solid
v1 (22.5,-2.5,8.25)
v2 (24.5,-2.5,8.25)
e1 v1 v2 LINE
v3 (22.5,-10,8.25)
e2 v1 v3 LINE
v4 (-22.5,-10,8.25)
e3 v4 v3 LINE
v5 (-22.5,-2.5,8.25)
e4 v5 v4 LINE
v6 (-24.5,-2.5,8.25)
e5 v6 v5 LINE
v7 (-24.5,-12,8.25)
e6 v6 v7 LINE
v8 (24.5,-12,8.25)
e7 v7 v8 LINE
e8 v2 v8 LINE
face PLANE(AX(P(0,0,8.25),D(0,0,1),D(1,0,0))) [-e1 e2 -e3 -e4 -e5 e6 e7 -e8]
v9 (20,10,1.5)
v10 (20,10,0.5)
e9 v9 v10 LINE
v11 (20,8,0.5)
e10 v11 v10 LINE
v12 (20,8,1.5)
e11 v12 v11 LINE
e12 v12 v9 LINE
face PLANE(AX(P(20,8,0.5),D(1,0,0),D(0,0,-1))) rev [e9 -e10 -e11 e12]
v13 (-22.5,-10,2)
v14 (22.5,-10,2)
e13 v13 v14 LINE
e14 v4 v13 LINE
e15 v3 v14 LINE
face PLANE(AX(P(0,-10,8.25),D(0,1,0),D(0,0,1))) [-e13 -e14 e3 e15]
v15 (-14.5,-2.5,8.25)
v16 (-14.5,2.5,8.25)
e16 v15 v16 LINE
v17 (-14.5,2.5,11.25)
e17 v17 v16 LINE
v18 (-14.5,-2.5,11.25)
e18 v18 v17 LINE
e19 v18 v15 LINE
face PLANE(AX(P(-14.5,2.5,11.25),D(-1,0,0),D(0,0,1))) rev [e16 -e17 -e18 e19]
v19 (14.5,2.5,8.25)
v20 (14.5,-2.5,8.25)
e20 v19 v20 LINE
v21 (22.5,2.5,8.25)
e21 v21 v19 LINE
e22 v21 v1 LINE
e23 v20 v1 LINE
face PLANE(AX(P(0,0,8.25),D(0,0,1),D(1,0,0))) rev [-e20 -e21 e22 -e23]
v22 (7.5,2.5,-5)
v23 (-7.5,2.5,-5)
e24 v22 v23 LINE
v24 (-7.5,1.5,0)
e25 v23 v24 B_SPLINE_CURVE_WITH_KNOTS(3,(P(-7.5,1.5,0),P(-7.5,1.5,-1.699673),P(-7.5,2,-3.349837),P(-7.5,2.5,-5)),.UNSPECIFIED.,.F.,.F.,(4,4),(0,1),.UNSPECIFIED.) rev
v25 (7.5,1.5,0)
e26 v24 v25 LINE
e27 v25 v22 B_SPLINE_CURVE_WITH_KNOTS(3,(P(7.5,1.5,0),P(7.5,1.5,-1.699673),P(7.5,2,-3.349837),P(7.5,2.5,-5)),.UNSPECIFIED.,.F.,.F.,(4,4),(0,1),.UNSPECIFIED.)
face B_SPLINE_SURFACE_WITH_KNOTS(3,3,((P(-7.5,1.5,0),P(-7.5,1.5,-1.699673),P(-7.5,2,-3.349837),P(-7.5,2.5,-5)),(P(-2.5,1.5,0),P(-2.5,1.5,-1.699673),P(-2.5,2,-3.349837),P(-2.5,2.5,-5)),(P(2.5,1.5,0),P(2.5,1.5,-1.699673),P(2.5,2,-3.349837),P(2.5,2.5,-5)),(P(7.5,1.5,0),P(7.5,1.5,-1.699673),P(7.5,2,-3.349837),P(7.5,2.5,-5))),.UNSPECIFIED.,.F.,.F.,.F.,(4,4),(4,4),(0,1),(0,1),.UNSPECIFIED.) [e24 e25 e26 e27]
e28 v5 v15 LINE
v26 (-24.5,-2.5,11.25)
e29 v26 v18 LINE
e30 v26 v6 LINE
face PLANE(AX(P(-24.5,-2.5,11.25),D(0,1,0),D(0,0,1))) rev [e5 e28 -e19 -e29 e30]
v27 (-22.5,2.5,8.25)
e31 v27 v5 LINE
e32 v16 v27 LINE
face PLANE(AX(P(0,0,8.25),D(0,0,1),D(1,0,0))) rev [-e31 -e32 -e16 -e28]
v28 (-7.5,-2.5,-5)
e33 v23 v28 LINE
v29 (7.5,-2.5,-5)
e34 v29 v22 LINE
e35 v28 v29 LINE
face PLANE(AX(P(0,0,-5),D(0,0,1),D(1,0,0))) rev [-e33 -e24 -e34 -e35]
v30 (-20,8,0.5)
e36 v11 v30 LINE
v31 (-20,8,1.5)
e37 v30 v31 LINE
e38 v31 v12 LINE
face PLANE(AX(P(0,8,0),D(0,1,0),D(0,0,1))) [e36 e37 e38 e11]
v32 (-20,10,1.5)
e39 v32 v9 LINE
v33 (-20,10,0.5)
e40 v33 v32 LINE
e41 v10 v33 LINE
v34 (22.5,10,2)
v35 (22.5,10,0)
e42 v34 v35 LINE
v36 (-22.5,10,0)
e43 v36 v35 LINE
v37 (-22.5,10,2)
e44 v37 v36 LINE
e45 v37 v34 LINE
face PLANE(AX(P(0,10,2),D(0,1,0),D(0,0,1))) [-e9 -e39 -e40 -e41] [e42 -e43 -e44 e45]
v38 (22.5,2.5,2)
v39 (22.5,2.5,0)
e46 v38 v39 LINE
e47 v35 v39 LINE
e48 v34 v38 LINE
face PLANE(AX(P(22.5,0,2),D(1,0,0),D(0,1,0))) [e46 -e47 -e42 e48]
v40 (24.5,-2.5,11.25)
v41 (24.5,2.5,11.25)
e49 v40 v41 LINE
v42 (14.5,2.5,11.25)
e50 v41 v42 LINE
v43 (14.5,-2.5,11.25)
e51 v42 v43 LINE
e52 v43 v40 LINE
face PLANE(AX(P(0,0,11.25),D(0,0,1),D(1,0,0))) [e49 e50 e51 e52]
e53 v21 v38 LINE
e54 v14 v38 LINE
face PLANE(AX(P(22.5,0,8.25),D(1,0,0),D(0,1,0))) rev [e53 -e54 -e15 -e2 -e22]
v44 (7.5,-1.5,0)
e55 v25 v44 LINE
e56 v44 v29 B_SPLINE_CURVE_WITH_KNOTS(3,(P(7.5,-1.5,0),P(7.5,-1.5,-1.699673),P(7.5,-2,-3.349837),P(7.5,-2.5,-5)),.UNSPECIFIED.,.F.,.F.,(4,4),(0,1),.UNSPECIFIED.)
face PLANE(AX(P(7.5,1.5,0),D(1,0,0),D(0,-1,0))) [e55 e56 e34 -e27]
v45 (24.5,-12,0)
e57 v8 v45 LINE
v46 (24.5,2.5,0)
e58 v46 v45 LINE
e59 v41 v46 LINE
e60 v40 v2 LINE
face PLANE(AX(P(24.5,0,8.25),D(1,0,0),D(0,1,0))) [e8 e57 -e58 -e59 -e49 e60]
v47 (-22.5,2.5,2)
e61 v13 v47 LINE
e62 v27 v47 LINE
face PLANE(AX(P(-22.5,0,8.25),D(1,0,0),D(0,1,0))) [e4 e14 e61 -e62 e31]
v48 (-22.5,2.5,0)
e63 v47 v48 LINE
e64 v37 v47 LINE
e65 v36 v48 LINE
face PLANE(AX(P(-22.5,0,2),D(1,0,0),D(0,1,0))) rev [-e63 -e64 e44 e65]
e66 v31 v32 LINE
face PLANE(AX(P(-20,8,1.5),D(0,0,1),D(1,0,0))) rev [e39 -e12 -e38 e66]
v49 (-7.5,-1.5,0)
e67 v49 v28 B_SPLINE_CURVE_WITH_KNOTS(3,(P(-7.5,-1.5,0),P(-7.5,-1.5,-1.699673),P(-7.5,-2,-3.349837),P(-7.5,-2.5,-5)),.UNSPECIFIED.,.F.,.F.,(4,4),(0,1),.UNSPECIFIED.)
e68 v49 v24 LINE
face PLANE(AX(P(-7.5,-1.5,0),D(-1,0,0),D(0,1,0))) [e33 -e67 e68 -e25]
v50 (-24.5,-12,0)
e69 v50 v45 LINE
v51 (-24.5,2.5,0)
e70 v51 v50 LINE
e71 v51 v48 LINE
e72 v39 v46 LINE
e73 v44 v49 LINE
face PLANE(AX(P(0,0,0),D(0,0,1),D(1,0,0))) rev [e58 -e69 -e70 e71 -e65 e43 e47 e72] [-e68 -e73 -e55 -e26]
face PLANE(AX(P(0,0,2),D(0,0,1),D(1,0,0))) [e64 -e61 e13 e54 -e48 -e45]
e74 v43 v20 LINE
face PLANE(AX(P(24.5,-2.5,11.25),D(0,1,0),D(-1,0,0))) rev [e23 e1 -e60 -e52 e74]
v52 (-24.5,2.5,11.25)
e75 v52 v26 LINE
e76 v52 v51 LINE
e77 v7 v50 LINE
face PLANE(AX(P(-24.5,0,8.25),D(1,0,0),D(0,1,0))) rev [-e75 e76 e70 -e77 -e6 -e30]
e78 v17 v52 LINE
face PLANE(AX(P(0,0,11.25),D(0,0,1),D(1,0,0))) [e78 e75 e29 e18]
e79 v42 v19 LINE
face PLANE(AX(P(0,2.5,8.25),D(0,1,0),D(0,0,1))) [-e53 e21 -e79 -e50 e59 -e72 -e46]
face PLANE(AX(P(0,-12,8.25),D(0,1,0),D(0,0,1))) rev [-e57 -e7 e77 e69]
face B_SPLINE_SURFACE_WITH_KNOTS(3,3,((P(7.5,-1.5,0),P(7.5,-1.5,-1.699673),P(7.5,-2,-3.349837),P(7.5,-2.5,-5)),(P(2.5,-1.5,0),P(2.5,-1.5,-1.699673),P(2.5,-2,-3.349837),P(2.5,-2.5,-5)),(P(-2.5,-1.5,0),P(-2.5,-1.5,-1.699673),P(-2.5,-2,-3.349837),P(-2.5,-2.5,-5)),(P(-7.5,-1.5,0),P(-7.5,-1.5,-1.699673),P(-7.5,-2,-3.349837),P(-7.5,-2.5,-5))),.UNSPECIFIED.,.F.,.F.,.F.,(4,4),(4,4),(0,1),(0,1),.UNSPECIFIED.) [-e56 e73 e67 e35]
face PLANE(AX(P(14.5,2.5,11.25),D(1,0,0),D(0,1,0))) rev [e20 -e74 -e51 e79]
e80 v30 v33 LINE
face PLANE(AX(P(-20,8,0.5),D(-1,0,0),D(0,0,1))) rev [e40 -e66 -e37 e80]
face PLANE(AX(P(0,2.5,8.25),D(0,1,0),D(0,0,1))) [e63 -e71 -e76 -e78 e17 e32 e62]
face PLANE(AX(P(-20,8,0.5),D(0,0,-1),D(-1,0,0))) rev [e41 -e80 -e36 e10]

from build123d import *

# Parameters (mm, degrees)
SKETCH1_W           = 45
SKETCH1_H           = 7.5
SKETCH1_H_2         = 12.5
BOSS_EXTRUDE1_DEPTH = 2
BOSS_EXTRUDE2_DEPTH = 8.25
SKETCH3_W           = 10
SKETCH3_H           = 5
BOSS_EXTRUDE3_DEPTH = 3
SKETCH4_W           = 40
SKETCH4_H           = 1
CUT_EXTRUDE1_DEPTH  = 2
LOFT2_START         = -7.5
LOFT2_DEPTH         = 15


# Read off the part's stored shape, not the designer's step: Loft2
with BuildPart() as part:
    # Sketch1 → Boss-Extrude1 (new body)
    with BuildSketch(Plane.XY):
        with Locations((0, 6.25)):
            Rectangle(SKETCH1_W, SKETCH1_H)
        with Locations((0, -3.75)):
            Rectangle(SKETCH1_W, SKETCH1_H_2)
    extrude(amount=BOSS_EXTRUDE1_DEPTH)

    # Sketch1<3> → Boss-Extrude2 (add)
    with BuildSketch(Plane.XY):
        Polygon((-22.5, 2.5), (-24.5, 2.5), (-24.5, -12), (24.5, -12), (24.5, 2.5), (22.5, 2.5), (22.5, -10), (-22.5, -10), align=None)
    extrude(amount=BOSS_EXTRUDE2_DEPTH)

    # Sketch3 → Boss-Extrude3 (add)
    with BuildSketch(Plane.XY.offset(8.25)):
        with Locations((-19.5, 0)):
            Rectangle(SKETCH3_W, SKETCH3_H)
        with Locations((19.5, 0)):
            Rectangle(SKETCH3_W, SKETCH3_H)
    extrude(amount=BOSS_EXTRUDE3_DEPTH)

    # Sketch4 → Cut-Extrude1 (cut)
    with BuildSketch(Plane(origin=(0, 10, 0), x_dir=(1, 0, 0), z_dir=(0, 1, 0))):
        with Locations((0, -1)):
            Rectangle(SKETCH4_W, SKETCH4_H)
    extrude(amount=-CUT_EXTRUDE1_DEPTH, mode=Mode.SUBTRACT)

    # Loft2 outline → Loft2 (add)
    with BuildSketch(Plane.YZ.offset(LOFT2_START)):
        with BuildLine():
            add(Edge.make_bspline(
                [(1.5, 0), (1.5, -1.699673171), (2, -3.349836586), (2.5, -5)],
                knots=[0, 0, 0, 0, 1, 1, 1, 1], degree=3))
            Line((1.5, 0), (-1.5, 0))
            add(Edge.make_bspline(
                [(-1.5, 0), (-1.5, -1.699673171), (-2, -3.349836586), (-2.5, -5)],
                knots=[0, 0, 0, 0, 1, 1, 1, 1], degree=3))
            Line((-2.5, -5), (2.5, -5))
        make_face()
    extrude(amount=LOFT2_DEPTH)


solid = part.part
